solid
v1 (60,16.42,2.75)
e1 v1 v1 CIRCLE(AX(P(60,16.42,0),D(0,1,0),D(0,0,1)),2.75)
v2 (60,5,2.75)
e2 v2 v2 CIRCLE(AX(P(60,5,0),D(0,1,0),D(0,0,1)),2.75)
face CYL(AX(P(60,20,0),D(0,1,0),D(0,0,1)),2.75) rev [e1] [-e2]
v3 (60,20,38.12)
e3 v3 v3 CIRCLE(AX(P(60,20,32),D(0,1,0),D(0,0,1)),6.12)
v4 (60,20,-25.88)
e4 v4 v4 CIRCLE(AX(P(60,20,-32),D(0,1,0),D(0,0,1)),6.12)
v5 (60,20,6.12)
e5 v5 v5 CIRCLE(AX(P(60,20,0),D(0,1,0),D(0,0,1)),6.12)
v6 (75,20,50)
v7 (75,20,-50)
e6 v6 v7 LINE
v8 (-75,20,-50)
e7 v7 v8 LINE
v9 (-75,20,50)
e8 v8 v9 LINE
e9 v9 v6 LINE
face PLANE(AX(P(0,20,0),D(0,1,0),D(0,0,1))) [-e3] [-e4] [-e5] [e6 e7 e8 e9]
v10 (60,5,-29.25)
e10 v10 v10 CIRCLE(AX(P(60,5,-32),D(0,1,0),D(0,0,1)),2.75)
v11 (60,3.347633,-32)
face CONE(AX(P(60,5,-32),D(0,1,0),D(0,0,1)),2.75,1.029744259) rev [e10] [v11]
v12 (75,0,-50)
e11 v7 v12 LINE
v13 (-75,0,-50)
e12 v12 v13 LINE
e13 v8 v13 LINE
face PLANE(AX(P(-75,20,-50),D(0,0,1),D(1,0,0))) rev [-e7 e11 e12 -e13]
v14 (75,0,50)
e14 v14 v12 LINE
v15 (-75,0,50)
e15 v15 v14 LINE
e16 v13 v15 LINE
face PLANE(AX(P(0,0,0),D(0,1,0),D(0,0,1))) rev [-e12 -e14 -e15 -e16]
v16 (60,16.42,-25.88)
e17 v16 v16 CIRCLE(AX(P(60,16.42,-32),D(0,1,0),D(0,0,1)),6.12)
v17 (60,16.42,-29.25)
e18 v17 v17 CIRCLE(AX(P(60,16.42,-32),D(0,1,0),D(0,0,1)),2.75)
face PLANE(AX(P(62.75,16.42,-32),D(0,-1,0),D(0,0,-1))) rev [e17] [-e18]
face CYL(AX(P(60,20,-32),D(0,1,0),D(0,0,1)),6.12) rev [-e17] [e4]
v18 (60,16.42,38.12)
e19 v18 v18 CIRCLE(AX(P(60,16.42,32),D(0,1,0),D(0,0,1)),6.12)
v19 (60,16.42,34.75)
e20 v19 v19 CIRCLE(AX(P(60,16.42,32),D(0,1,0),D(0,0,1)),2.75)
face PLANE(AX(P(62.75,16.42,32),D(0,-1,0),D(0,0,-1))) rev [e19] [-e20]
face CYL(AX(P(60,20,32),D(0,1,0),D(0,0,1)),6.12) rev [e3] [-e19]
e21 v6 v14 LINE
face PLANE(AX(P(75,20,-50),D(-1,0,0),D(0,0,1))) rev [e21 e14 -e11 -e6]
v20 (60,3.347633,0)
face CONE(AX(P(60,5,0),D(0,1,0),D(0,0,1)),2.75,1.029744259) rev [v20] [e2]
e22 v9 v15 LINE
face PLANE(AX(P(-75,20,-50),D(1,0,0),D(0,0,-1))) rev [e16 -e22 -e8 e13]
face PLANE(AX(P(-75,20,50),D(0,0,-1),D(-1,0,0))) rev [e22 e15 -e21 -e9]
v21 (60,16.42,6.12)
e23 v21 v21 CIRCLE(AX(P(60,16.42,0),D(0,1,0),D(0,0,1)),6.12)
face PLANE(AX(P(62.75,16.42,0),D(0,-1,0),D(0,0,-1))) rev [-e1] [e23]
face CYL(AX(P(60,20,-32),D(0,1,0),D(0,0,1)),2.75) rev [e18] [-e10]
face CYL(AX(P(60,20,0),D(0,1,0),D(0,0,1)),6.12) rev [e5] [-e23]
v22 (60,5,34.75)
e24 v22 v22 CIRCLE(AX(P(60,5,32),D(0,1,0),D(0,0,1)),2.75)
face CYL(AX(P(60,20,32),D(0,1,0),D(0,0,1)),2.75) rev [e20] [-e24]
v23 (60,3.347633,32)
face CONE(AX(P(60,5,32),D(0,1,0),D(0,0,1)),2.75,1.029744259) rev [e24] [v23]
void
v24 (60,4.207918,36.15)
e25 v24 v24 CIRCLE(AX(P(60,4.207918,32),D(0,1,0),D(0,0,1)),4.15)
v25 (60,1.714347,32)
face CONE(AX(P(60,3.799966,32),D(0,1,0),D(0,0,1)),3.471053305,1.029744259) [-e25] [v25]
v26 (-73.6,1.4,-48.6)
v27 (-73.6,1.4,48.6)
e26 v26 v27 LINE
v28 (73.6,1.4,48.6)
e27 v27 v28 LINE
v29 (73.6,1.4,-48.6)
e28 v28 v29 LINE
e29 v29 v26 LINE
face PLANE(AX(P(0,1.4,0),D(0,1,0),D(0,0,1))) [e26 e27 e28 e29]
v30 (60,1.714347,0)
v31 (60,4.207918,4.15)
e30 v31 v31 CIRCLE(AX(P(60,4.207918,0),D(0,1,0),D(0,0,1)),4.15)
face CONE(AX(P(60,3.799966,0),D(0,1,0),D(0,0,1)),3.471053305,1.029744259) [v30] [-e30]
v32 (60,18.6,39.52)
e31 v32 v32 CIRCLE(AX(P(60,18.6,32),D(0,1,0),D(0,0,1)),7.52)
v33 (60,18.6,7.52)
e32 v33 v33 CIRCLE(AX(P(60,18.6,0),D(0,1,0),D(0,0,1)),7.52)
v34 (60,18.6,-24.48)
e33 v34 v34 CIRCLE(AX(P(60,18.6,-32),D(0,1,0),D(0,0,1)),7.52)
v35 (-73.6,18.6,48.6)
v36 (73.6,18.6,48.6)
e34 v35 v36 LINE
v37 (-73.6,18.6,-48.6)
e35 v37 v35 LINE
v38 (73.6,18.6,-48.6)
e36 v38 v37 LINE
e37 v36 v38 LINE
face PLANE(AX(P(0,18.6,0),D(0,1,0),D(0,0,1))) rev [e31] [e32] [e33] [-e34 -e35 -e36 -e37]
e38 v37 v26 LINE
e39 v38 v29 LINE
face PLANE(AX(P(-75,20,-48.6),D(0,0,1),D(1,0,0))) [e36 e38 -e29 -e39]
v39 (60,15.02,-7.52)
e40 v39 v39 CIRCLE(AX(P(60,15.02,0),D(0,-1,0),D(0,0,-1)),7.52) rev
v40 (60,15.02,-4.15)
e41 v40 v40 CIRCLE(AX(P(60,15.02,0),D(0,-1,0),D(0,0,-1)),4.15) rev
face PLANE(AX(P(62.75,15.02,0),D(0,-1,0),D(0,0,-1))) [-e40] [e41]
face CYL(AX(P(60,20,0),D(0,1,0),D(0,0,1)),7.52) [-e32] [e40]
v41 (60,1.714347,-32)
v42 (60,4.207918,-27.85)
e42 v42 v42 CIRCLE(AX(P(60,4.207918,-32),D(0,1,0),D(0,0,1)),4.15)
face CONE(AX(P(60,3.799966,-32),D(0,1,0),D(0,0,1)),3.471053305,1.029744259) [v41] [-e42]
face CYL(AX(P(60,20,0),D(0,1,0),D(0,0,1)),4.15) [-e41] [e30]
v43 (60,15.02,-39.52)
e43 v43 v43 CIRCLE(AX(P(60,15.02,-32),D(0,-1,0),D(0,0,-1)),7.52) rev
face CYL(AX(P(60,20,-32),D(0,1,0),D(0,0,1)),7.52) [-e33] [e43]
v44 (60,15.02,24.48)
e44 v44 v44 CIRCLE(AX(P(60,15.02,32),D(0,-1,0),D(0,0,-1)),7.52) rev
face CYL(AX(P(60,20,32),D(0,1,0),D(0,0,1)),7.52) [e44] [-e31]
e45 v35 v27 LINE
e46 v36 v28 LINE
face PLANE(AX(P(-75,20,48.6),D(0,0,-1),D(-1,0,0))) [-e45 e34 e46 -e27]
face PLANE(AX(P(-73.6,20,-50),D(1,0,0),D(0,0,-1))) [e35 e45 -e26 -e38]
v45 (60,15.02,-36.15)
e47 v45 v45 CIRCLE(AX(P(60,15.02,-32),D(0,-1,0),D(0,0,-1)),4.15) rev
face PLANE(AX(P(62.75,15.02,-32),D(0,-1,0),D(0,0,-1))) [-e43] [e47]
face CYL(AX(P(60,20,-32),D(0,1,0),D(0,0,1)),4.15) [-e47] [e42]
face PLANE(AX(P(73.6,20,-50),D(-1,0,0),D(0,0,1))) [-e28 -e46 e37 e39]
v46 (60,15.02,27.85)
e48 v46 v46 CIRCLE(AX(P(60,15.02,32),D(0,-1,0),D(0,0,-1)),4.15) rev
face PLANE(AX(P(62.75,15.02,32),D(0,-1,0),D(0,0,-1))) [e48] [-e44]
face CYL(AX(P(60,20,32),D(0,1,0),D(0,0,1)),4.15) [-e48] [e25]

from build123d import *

# Parameters (mm, degrees)
SKETCH1_W                               = 150
SKETCH1_H                               = 100
BOSS_EXTRUDE1_DEPTH                     = 20
CBORE_FOR_M5_HEX_HEAD_BOLT1_D           = 5.5
CBORE_FOR_M5_HEX_HEAD_BOLT1_DEPTH       = 15
CBORE_FOR_M5_HEX_HEAD_BOLT1_CBORE_D     = 12.24
CBORE_FOR_M5_HEX_HEAD_BOLT1_CBORE_DEPTH = 3.58
CBORE_FOR_M5_HEX_HEAD_BOLT1_TIP         = 1.652366702
SHELL1_START                            = 1.4
SHELL1_OUTLINE_W                        = 147.2
SHELL1_OUTLINE_H                        = 97.2
SHELL1_OUTLINE_R                        = 7.52
SHELL1_DEPTH                            = 17.2
SHELL1_2_OUTLINE_R                      = 7.52
SHELL1_2_OUTLINE_R_2                    = 4.15
SHELL1_2_DEPTH                          = 13.62
SHELL1_3_OUTLINE_R                      = 4.15
SHELL1_3_DEPTH                          = 0.314346442


with BuildPart() as part:
    # Sketch1 → Boss-Extrude1 (new body)
    with BuildSketch(Plane(origin=(0, 0, 0), x_dir=(1, 0, 0), z_dir=(0, 1, 0))):
        Rectangle(SKETCH1_W, SKETCH1_H)
    extrude(amount=BOSS_EXTRUDE1_DEPTH)

    # CBORE for M5 Hex Head Bolt1
    with Locations(Plane(origin=(0, 20, 0), x_dir=(1, 0, 0), z_dir=(0, 1, 0))):
        with Locations((60, 0), (60, 32), (60, -32)):
            CounterBoreHole(CBORE_FOR_M5_HEX_HEAD_BOLT1_D / 2, CBORE_FOR_M5_HEX_HEAD_BOLT1_CBORE_D / 2, CBORE_FOR_M5_HEX_HEAD_BOLT1_CBORE_DEPTH, depth=CBORE_FOR_M5_HEX_HEAD_BOLT1_DEPTH)
            with Locations((0, 0, -(CBORE_FOR_M5_HEX_HEAD_BOLT1_DEPTH + CBORE_FOR_M5_HEX_HEAD_BOLT1_TIP / 2))):  # 118° drill point
                Cone(0, CBORE_FOR_M5_HEX_HEAD_BOLT1_D / 2, CBORE_FOR_M5_HEX_HEAD_BOLT1_TIP, mode=Mode.SUBTRACT)

    # Shell1: read off the stored shape, not the designer's step
    # Shell1 outline → Shell1 (cut)
    with BuildSketch(Plane(origin=(0, 0, 0), x_dir=(1, 0, 0), z_dir=(0, 1, 0)).offset(SHELL1_START)):
        Rectangle(SHELL1_OUTLINE_W, SHELL1_OUTLINE_H)
        with Locations((60, -32)):
            Circle(SHELL1_OUTLINE_R, mode=Mode.SUBTRACT)
        with Locations((60, 0)):
            Circle(SHELL1_OUTLINE_R, mode=Mode.SUBTRACT)
        with Locations((60, 32)):
            Circle(SHELL1_OUTLINE_R, mode=Mode.SUBTRACT)
    extrude(amount=SHELL1_DEPTH, mode=Mode.SUBTRACT)

    # Shell1 2 outline → Shell1 2 (cut)
    # profile 1 of 3: a face of its own
    with BuildSketch(Plane(origin=(0, 0, 0), x_dir=(1, 0, 0), z_dir=(0, 1, 0)).offset(SHELL1_START)):
        with Locations((60, -32)):
            Circle(SHELL1_2_OUTLINE_R)
        with Locations((60, -32)):
            Circle(SHELL1_2_OUTLINE_R_2, mode=Mode.SUBTRACT)
    # profile 2 of 3: a face of its own
    with BuildSketch(Plane(origin=(0, 0, 0), x_dir=(1, 0, 0), z_dir=(0, 1, 0)).offset(SHELL1_START)):
        with Locations((60, 32)):
            Circle(SHELL1_2_OUTLINE_R)
        with Locations((60, 32)):
            Circle(SHELL1_2_OUTLINE_R_2, mode=Mode.SUBTRACT)
    # profile 3 of 3: a face of its own
    with BuildSketch(Plane(origin=(0, 0, 0), x_dir=(1, 0, 0), z_dir=(0, 1, 0)).offset(SHELL1_START)):
        with Locations((60, 0)):
            Circle(SHELL1_2_OUTLINE_R)
        with Locations((60, 0)):
            Circle(SHELL1_2_OUTLINE_R_2, mode=Mode.SUBTRACT)
    extrude(amount=SHELL1_2_DEPTH, mode=Mode.SUBTRACT)

    # Shell1 3 outline → Shell1 3 (cut)
    with BuildSketch(Plane(origin=(0, 0, 0), x_dir=(1, 0, 0), z_dir=(0, 1, 0)).offset(SHELL1_START)):
        with Locations((60, -32)):
            Circle(SHELL1_3_OUTLINE_R)
        with Locations((60, 32)):
            Circle(SHELL1_3_OUTLINE_R)
        with Locations((60, 0)):
            Circle(SHELL1_3_OUTLINE_R)
    extrude(amount=SHELL1_3_DEPTH, mode=Mode.SUBTRACT)

    # Shell1 4 outline → Shell1 4 (revolve, cut)
    with BuildSketch(Plane(origin=(60, 0, 32), x_dir=(1, 0, 0), z_dir=(0, 0, 1))):
        Polygon((4.15, 4.207918111), (0, 1.714346542), (4.15, 1.714346442), align=None)
    revolve(axis=Axis((60, 0, 32), (0, 1, 0)), mode=Mode.SUBTRACT)

    # Shell1 5 outline → Shell1 5 (revolve, cut)
    with BuildSketch(Plane(origin=(60, 0, -32), x_dir=(1, 0, 0), z_dir=(0, 0, 1))):
        Polygon((4.15, 4.207918111), (0, 1.714346542), (4.15, 1.714346442), align=None)
    revolve(axis=Axis((60, 0, -32), (0, 1, 0)), mode=Mode.SUBTRACT)

    # Shell1 6 outline → Shell1 6 (revolve, cut)
    with BuildSketch(Plane(origin=(60, 0, 0), x_dir=(1, 0, 0), z_dir=(0, 0, 1))):
        Polygon((4.15, 4.207918111), (0, 1.714346542), (4.15, 1.714346442), align=None)
    revolve(axis=Axis((60, 0, 0), (0, 1, 0)), mode=Mode.SUBTRACT)


solid = part.part
